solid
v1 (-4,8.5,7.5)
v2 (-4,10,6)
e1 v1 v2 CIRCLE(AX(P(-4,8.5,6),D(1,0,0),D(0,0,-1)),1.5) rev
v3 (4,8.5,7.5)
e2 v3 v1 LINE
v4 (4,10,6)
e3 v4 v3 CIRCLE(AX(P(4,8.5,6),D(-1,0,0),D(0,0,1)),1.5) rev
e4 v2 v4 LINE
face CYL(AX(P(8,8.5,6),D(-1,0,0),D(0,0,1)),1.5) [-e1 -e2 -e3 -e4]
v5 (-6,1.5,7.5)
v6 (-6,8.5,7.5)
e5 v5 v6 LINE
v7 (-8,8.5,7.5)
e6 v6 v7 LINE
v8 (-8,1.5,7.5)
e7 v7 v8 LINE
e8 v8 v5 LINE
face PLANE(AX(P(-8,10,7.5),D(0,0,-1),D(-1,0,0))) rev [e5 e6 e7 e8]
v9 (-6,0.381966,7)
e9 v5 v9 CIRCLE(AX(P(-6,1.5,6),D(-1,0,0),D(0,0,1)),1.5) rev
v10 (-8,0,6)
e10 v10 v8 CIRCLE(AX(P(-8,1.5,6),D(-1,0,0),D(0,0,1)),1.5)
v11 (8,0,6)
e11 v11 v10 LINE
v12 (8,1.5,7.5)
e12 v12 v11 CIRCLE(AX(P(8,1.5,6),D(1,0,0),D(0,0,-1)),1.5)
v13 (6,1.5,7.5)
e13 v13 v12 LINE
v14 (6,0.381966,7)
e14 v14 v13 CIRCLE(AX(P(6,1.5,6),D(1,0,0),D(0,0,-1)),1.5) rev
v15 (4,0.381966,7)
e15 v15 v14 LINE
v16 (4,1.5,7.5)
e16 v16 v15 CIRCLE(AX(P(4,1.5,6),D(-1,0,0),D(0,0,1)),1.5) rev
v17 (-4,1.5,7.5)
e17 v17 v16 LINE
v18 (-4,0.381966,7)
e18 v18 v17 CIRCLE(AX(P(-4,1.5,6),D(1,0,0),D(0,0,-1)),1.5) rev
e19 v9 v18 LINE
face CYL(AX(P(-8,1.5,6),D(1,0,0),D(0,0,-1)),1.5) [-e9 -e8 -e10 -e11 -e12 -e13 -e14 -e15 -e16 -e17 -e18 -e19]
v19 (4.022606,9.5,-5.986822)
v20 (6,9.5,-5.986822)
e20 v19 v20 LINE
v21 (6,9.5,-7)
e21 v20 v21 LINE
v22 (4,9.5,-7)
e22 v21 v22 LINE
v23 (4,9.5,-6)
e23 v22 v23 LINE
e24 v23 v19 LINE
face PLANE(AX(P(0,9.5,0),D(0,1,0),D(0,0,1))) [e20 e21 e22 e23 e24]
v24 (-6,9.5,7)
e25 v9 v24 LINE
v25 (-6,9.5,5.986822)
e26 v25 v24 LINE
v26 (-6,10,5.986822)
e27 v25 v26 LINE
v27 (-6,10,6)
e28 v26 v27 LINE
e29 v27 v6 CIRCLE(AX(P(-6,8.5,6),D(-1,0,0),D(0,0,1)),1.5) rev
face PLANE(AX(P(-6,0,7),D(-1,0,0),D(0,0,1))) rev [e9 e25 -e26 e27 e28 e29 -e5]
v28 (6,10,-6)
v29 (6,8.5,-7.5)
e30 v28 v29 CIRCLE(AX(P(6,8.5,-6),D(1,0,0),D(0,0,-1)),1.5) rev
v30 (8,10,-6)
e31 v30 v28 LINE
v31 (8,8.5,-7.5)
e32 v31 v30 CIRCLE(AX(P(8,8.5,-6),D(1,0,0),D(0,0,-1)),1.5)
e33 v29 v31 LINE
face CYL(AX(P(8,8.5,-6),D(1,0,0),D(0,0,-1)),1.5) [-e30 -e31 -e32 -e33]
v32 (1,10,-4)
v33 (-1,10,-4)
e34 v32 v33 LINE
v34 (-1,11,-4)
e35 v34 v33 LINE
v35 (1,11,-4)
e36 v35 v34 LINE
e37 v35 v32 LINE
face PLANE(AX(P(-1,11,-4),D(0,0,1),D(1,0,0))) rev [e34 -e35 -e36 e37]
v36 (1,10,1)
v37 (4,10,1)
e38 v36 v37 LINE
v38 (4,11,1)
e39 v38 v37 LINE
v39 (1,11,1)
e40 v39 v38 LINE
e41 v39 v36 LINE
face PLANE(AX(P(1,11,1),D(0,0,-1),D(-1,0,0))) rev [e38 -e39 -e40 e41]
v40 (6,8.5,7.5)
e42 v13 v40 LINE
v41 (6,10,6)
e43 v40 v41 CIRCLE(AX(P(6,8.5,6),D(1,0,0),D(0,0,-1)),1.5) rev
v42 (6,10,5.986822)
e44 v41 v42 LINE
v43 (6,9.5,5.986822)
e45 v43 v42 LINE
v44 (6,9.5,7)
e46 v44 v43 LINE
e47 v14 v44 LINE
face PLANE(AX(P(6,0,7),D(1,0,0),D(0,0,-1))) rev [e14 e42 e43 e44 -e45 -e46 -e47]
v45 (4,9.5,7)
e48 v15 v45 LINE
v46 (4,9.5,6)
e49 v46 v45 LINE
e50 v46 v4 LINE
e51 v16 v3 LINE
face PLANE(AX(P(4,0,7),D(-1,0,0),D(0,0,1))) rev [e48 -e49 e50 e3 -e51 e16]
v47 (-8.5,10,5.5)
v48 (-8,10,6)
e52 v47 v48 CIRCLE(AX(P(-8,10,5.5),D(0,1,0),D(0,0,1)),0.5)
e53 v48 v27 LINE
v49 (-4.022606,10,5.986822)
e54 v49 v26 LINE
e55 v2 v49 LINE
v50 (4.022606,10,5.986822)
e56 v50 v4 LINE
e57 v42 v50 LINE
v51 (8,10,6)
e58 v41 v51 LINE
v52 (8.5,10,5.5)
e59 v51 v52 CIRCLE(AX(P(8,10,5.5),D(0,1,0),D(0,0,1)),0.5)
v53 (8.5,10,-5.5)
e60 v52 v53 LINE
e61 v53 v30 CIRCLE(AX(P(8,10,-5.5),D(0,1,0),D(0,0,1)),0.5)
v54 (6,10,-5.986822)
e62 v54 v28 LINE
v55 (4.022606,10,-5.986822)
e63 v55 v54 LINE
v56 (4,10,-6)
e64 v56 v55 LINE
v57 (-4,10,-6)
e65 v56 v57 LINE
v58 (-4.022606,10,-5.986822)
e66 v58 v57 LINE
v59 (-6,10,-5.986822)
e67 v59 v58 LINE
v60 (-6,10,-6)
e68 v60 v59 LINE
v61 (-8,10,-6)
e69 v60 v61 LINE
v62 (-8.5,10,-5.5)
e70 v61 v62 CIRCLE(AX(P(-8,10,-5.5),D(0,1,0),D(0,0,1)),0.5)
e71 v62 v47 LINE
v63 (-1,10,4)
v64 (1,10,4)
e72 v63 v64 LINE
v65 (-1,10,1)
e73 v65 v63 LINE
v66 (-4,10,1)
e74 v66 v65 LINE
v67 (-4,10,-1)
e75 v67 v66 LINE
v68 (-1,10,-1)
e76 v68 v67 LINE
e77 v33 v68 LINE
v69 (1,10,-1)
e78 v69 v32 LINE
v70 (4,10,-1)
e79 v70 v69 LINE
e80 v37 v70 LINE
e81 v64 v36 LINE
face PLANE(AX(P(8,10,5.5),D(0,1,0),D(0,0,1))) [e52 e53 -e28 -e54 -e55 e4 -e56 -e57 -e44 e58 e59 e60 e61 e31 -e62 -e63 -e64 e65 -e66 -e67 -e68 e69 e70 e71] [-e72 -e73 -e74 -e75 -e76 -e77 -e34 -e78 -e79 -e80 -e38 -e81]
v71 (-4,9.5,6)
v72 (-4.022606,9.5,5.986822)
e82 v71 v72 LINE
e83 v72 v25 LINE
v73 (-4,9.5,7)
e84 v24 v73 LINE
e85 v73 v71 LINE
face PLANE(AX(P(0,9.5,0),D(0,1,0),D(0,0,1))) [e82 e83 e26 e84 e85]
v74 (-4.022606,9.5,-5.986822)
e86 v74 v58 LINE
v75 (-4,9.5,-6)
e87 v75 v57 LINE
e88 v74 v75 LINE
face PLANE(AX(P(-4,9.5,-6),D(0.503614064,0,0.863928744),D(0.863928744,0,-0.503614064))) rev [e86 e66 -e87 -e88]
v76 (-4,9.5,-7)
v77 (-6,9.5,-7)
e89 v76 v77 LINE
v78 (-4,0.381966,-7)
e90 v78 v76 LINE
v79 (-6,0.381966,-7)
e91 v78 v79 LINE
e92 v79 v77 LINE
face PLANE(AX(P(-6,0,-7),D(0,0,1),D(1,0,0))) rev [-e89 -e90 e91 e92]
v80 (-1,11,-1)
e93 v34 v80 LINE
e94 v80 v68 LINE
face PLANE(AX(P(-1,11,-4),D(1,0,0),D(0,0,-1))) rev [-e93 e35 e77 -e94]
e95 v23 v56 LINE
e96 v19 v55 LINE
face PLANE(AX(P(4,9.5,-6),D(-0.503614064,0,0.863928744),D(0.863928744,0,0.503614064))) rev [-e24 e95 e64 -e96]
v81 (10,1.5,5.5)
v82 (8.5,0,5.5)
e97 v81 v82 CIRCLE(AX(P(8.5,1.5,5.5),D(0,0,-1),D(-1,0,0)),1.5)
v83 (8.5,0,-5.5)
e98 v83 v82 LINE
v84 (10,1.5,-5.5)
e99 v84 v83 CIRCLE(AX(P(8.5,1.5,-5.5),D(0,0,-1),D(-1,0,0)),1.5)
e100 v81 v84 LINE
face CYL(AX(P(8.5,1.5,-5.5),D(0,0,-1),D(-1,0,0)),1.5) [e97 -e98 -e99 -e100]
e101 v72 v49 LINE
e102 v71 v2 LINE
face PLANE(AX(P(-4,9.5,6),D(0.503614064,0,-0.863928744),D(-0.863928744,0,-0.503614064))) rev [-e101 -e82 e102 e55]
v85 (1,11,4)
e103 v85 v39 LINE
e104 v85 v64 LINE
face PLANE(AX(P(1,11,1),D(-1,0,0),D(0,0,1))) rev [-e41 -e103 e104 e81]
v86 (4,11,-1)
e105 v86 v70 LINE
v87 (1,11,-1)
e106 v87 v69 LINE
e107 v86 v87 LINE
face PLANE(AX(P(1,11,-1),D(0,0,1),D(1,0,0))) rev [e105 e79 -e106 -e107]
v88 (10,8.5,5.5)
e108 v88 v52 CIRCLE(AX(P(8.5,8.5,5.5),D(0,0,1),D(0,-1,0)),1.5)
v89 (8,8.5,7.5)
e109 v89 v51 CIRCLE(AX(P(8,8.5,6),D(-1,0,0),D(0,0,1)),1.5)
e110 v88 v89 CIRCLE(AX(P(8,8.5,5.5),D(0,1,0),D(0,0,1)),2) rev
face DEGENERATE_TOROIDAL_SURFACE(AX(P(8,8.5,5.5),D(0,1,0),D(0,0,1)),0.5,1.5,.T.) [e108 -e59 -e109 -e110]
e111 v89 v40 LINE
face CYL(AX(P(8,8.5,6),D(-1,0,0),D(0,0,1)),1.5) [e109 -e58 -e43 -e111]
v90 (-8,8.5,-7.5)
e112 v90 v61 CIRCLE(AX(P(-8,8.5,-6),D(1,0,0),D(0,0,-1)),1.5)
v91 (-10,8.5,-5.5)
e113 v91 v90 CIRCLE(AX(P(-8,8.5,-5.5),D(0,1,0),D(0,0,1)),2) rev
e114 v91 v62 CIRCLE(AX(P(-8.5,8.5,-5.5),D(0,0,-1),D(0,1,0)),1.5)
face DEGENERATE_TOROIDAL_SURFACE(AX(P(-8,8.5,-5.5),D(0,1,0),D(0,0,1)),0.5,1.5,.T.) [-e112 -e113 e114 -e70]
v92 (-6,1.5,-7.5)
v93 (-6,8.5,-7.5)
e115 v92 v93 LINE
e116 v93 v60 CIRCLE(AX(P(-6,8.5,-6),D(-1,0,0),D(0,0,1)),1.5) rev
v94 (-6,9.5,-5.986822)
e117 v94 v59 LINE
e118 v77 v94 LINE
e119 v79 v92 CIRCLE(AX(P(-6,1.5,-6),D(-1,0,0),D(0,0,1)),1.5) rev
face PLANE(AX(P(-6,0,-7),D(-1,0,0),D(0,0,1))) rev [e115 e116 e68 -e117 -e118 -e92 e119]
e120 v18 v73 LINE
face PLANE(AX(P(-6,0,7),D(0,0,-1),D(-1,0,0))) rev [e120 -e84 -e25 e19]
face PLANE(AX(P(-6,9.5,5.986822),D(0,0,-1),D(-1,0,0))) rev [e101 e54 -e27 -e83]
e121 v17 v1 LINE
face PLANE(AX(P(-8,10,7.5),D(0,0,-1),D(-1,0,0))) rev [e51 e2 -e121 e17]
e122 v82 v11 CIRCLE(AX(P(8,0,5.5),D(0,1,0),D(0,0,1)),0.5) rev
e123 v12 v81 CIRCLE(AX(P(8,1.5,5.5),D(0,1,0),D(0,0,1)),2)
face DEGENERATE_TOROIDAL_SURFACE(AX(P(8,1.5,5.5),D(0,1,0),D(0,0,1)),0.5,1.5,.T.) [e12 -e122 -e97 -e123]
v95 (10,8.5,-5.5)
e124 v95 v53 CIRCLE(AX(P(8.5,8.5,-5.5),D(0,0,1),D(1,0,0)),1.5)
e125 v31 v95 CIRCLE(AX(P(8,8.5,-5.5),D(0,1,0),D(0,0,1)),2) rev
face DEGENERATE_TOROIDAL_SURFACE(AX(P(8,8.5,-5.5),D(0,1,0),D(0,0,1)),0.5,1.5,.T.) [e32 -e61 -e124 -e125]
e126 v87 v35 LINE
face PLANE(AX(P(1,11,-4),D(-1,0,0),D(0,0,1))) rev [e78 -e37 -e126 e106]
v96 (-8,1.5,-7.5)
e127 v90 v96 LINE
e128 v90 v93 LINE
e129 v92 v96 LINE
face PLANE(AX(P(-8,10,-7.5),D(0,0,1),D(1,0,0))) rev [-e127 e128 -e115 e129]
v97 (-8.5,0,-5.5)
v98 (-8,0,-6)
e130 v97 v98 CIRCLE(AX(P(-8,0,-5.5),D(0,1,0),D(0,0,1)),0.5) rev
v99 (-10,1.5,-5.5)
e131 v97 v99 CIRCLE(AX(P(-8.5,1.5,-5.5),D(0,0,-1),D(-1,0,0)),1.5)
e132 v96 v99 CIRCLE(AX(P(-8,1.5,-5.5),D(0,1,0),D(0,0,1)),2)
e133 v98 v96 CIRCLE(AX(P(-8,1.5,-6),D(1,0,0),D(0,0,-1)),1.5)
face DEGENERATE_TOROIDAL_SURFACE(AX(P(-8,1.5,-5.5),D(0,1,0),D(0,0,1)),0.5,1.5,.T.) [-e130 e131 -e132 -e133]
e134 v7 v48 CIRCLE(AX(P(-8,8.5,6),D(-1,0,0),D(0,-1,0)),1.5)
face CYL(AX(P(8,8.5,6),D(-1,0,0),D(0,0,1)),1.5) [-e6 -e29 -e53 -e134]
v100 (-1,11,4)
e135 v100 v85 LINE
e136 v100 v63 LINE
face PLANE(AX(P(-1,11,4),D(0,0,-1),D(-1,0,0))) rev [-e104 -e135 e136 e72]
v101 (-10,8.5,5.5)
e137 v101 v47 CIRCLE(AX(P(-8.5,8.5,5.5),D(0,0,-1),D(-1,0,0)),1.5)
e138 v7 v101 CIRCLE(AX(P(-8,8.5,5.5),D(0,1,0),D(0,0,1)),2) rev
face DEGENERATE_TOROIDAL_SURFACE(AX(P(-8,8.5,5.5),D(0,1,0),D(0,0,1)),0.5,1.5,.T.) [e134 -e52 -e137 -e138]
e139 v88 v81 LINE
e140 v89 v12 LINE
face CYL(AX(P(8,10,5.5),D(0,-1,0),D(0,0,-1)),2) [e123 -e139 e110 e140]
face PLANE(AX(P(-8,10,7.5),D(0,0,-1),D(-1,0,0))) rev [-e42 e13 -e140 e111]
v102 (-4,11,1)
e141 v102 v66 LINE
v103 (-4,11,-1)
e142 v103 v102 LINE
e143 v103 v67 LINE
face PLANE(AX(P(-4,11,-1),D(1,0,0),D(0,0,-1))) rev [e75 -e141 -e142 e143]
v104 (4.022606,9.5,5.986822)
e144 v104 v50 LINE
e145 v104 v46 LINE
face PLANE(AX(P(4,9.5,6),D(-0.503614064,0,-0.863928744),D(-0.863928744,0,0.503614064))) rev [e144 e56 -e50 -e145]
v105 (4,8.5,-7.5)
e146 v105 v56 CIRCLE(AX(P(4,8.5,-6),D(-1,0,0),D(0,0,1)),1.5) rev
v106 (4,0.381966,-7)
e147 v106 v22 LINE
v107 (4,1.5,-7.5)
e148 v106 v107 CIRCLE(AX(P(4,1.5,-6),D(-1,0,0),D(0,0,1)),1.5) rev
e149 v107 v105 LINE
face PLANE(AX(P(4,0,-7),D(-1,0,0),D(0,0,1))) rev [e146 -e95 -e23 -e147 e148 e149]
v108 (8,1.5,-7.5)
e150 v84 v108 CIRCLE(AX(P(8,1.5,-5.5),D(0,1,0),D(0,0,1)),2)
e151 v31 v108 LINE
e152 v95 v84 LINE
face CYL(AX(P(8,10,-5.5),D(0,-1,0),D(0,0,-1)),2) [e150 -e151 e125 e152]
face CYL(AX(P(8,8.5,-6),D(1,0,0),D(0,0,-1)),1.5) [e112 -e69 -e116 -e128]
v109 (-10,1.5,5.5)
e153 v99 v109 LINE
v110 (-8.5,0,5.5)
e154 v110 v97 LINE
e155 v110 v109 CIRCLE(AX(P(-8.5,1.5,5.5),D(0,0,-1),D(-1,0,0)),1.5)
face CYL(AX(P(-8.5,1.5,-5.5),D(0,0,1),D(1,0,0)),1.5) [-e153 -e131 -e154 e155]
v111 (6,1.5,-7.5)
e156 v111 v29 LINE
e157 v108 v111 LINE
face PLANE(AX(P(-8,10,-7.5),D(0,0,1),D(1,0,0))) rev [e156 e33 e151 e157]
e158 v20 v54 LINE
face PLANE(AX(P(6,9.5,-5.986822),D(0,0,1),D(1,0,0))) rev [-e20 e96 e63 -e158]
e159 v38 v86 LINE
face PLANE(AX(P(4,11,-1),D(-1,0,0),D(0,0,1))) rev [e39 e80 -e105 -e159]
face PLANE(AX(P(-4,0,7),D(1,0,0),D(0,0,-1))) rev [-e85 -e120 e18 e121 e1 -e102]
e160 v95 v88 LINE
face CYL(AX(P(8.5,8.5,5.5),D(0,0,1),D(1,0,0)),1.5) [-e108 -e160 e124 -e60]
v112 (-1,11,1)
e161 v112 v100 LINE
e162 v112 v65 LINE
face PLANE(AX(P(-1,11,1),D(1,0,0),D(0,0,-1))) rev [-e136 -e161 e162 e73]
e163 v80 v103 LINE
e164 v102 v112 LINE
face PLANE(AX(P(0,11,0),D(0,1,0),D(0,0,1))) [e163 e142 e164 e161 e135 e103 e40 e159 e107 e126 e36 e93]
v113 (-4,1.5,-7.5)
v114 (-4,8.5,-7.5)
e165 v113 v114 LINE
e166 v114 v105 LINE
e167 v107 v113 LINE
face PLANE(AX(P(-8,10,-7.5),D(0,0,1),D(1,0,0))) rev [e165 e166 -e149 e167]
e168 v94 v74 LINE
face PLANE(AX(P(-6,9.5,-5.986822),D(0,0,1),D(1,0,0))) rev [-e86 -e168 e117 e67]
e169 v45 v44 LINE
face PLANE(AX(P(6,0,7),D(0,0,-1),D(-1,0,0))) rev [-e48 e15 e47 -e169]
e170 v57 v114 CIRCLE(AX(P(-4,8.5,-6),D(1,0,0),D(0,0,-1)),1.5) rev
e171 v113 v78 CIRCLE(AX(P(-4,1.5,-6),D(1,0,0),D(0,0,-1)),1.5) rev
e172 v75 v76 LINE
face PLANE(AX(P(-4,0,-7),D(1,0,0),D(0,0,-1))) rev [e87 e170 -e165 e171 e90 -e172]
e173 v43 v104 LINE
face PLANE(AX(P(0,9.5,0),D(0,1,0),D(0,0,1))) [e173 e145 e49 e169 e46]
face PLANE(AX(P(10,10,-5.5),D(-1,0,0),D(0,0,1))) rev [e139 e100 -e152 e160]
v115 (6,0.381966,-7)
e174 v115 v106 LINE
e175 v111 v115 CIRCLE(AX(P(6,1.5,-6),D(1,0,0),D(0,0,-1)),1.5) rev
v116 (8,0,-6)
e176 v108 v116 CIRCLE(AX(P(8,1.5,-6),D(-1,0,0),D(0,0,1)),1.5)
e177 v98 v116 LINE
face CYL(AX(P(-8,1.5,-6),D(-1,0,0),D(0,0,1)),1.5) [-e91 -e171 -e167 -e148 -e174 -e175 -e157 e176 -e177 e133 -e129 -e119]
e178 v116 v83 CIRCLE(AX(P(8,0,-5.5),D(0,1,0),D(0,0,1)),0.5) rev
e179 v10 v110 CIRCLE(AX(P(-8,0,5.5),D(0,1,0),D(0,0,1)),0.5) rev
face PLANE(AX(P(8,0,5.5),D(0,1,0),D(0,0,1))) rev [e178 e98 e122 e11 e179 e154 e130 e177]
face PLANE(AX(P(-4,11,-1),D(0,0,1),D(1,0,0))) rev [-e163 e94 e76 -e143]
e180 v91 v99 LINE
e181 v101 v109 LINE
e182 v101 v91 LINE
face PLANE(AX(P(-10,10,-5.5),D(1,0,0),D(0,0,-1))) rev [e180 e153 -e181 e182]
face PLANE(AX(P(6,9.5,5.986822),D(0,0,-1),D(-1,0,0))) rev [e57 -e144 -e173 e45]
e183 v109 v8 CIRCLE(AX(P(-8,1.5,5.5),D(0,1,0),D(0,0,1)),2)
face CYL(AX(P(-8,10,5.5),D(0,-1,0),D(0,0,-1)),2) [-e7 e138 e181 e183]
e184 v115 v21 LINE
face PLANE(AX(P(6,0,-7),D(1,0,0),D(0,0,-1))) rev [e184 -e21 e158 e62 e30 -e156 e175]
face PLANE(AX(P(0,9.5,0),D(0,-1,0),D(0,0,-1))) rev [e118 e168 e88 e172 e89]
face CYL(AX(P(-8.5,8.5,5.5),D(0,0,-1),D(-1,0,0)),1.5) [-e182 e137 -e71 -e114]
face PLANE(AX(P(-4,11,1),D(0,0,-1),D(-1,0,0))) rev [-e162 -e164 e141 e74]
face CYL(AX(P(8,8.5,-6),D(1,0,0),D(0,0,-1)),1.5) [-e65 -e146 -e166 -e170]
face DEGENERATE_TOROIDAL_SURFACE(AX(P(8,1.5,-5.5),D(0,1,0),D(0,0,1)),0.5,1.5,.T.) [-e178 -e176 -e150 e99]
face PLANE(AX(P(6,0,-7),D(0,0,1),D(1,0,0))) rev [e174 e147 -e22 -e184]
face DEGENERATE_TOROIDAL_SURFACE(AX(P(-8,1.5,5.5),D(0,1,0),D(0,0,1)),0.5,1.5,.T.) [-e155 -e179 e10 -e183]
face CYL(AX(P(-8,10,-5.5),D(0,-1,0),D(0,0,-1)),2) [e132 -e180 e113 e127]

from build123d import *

# Parameters (mm, degrees)
BOSS_EXTRUDE1_DEPTH = 10
SKETCH2_W           = 2
SKETCH2_H           = 0.5
CUT_EXTRUDE1_DEPTH  = 10
CUT_EXTRUDE2_DEPTH  = 0.5
FILLET1_R           = 1.5
FILLET2_R           = 1.5
BOSS_EXTRUDE2_DEPTH = 1


with BuildPart() as part:
    # Sketch1 → Boss-Extrude1 (new body)
    with BuildSketch(Plane(origin=(0, 0, 0), x_dir=(1, 0, 0), z_dir=(0, 1, 0))):
        with BuildLine():
            Line((-8, 7.5), (8, 7.5))
            ThreePointArc((8, 7.5), (9.414213562, 6.914213562), (10, 5.5))
            Line((10, 5.5), (10, -5.5))
            ThreePointArc((10, -5.5), (9.414213562, -6.914213562), (8, -7.5))
            Line((8, -7.5), (-8, -7.5))
            ThreePointArc((-8, -7.5), (-9.414213562, -6.914213562), (-10, -5.5))
            Line((-10, -5.5), (-10, 5.5))
            ThreePointArc((-10, 5.5), (-9.414213562, 6.914213562), (-8, 7.5))
        make_face()
    extrude(amount=BOSS_EXTRUDE1_DEPTH)

    # Sketch2 → Cut-Extrude1 (cut)
    with BuildSketch(Plane(origin=(0, 10, 0), x_dir=(1, 0, 0), z_dir=(0, 1, 0))):
        with Locations((-5, 7.25)):
            Rectangle(SKETCH2_W, SKETCH2_H)
        with Locations((5, 7.25)):
            Rectangle(SKETCH2_W, SKETCH2_H)
        with Locations((5, -7.25)):
            Rectangle(SKETCH2_W, SKETCH2_H)
        with Locations((-5, -7.25)):
            Rectangle(SKETCH2_W, SKETCH2_H)
    extrude(amount=-CUT_EXTRUDE1_DEPTH, mode=Mode.SUBTRACT)

    # Sketch3 → Cut-Extrude2 (cut)
    with BuildSketch(Plane(origin=(0, 10, 0), x_dir=(1, 0, 0), z_dir=(0, 1, 0))):
        Polygon((-6, 7), (-6, 5.986822399), (-4.02260562, 5.986822399), (-4, 6), (-4, 7), align=None)
        Polygon((4, 7), (4, 6), (4.02260562, 5.986822399), (6, 5.986822399), (6, 7), align=None)
        Polygon((6, -7), (4, -7), (4, -6), (4.02260562, -5.986822399), (6, -5.986822399), align=None)
        Polygon((-4, -7), (-4, -6), (-4.02260562, -5.986822399), (-6, -5.986822399), (-6, -7), align=None)
    extrude(amount=-CUT_EXTRUDE2_DEPTH, mode=Mode.SUBTRACT)

    # Fillet1
    fillet1_edges = [part.edges().sort_by_distance(p)[0] for p in [
        (-9.414213562, 10, 6.914213562),
        (-10, 10, 0),
        (-9.414213562, 10, -6.914213562),
        (7, 10, -7.5),
        (-7, 10, -7.5),
        (9.414213562, 10, -6.914213562),
        (10, 10, 0),
        (9.414213562, 10, 6.914213562),
        (7, 10, 7.5),
        (-7, 10, 7.5),
        (0, 10, 7.5),
        (0, 10, -7.5),
    ]]
    fillet(fillet1_edges, radius=FILLET1_R)

    # Fillet2
    # the kernel refuses this fillet: 1.5 mm, written as the material it takes off along each edge
    with BuildSketch(Plane(origin=(2.25, 0, -7.5), x_dir=(0, 0, 1), z_dir=(1, 0, 0)), Plane(origin=(8, 0, 7.5), x_dir=(0, 0, -1), z_dir=(-1, 0, 0)), Plane(origin=(-2.25, 0, 7.5), x_dir=(0, 0, -1), z_dir=(-1, 0, 0))) as fillet2_piece_1:
        with BuildLine():
            CenterArc((FILLET2_R, -FILLET2_R), FILLET2_R, 90, 90)
            Line((0, -FILLET2_R), (0, 0))
            Line((0, 0), (FILLET2_R, 0))
        make_face()
    extrude(amount=5.75, mode=Mode.SUBTRACT)
    with BuildSketch(Plane(origin=(8, 0, -5.5), x_dir=(0, 0, -1), z_dir=(-1, 0, 0))) as fillet2_piece_2:
        with BuildLine():
            CenterArc((2 - FILLET2_R, -FILLET2_R), FILLET2_R, 0, 90)
            Line((2, -FILLET2_R), (2, 0))
            Line((2, 0), (2 - FILLET2_R, 0))
        make_face()
    revolve(axis=Axis((8, 0, -5.5), (0, -1, 0)), revolution_arc=90, mode=Mode.SUBTRACT)
    with BuildSketch(Plane(origin=(10, 0, -5.5), x_dir=(-1, 0, 0), z_dir=(0, 0, 1)), Plane(origin=(-10, 0, 5.5), x_dir=(1, 0, 0), z_dir=(0, 0, -1))) as fillet2_piece_3:
        with BuildLine():
            CenterArc((FILLET2_R, -FILLET2_R), FILLET2_R, 90, 90)
            Line((0, -FILLET2_R), (0, 0))
            Line((0, 0), (FILLET2_R, 0))
        make_face()
    extrude(amount=11, mode=Mode.SUBTRACT)
    with BuildSketch(Plane(origin=(8, 0, 5.5), x_dir=(1, 0, 0), z_dir=(0, 0, -1))) as fillet2_piece_4:
        with BuildLine():
            CenterArc((2 - FILLET2_R, -FILLET2_R), FILLET2_R, 0, 90)
            Line((2, -FILLET2_R), (2, 0))
            Line((2, 0), (2 - FILLET2_R, 0))
        make_face()
    revolve(axis=Axis((8, 0, 5.5), (0, -1, 0)), revolution_arc=90, mode=Mode.SUBTRACT)
    with BuildSketch(Plane(origin=(7.75, 0, 7.5), x_dir=(0, 0, -1), z_dir=(-1, 0, 0)), Plane(origin=(-7.75, 0, -7.5), x_dir=(0, 0, 1), z_dir=(1, 0, 0))) as fillet2_piece_5:
        with BuildLine():
            CenterArc((FILLET2_R, -FILLET2_R), FILLET2_R, 90, 90)
            Line((0, -FILLET2_R), (0, 0))
            Line((0, 0), (FILLET2_R, 0))
        make_face()
    extrude(amount=15.5, mode=Mode.SUBTRACT)
    with BuildSketch(Plane(origin=(-8, 0, -7.5), x_dir=(0, 1, 0), z_dir=(1, 0, 0))) as fillet2_piece_6:
        with BuildLine():
            CenterArc((FILLET2_R, FILLET2_R), FILLET2_R, 180, 90)
            Line((0, FILLET2_R), (0, 0))
            Line((0, 0), (FILLET2_R, 0))
        make_face()
    extrude(amount=5.75, mode=Mode.SUBTRACT)
    with BuildSketch(Plane(origin=(-8, 0, 5.5), x_dir=(0, 0, 1), z_dir=(1, 0, 0))) as fillet2_piece_7:
        with BuildLine():
            CenterArc((2 - FILLET2_R, -FILLET2_R), FILLET2_R, 0, 90)
            Line((2, -FILLET2_R), (2, 0))
            Line((2, 0), (2 - FILLET2_R, 0))
        make_face()
    revolve(axis=Axis((-8, 0, 5.5), (0, -1, 0)), revolution_arc=90, mode=Mode.SUBTRACT)
    with BuildSketch(Plane(origin=(-8, 0, -5.5), x_dir=(-1, 0, 0), z_dir=(0, 0, 1))) as fillet2_piece_8:
        with BuildLine():
            CenterArc((2 - FILLET2_R, -FILLET2_R), FILLET2_R, 0, 90)
            Line((2, -FILLET2_R), (2, 0))
            Line((2, 0), (2 - FILLET2_R, 0))
        make_face()
    revolve(axis=Axis((-8, 0, -5.5), (0, -1, 0)), revolution_arc=90, mode=Mode.SUBTRACT)

    # Sketch4 → Boss-Extrude2 (add)
    with BuildSketch(Plane(origin=(0, 10, 0), x_dir=(1, 0, 0), z_dir=(0, 1, 0))):
        Polygon((-1, 4), (1, 4), (1, 1), (4, 1), (4, -1), (1, -1), (1, -4), (-1, -4), (-1, -1), (-4, -1), (-4, 1), (-1, 1), align=None)
    extrude(amount=BOSS_EXTRUDE2_DEPTH)


solid = part.part
